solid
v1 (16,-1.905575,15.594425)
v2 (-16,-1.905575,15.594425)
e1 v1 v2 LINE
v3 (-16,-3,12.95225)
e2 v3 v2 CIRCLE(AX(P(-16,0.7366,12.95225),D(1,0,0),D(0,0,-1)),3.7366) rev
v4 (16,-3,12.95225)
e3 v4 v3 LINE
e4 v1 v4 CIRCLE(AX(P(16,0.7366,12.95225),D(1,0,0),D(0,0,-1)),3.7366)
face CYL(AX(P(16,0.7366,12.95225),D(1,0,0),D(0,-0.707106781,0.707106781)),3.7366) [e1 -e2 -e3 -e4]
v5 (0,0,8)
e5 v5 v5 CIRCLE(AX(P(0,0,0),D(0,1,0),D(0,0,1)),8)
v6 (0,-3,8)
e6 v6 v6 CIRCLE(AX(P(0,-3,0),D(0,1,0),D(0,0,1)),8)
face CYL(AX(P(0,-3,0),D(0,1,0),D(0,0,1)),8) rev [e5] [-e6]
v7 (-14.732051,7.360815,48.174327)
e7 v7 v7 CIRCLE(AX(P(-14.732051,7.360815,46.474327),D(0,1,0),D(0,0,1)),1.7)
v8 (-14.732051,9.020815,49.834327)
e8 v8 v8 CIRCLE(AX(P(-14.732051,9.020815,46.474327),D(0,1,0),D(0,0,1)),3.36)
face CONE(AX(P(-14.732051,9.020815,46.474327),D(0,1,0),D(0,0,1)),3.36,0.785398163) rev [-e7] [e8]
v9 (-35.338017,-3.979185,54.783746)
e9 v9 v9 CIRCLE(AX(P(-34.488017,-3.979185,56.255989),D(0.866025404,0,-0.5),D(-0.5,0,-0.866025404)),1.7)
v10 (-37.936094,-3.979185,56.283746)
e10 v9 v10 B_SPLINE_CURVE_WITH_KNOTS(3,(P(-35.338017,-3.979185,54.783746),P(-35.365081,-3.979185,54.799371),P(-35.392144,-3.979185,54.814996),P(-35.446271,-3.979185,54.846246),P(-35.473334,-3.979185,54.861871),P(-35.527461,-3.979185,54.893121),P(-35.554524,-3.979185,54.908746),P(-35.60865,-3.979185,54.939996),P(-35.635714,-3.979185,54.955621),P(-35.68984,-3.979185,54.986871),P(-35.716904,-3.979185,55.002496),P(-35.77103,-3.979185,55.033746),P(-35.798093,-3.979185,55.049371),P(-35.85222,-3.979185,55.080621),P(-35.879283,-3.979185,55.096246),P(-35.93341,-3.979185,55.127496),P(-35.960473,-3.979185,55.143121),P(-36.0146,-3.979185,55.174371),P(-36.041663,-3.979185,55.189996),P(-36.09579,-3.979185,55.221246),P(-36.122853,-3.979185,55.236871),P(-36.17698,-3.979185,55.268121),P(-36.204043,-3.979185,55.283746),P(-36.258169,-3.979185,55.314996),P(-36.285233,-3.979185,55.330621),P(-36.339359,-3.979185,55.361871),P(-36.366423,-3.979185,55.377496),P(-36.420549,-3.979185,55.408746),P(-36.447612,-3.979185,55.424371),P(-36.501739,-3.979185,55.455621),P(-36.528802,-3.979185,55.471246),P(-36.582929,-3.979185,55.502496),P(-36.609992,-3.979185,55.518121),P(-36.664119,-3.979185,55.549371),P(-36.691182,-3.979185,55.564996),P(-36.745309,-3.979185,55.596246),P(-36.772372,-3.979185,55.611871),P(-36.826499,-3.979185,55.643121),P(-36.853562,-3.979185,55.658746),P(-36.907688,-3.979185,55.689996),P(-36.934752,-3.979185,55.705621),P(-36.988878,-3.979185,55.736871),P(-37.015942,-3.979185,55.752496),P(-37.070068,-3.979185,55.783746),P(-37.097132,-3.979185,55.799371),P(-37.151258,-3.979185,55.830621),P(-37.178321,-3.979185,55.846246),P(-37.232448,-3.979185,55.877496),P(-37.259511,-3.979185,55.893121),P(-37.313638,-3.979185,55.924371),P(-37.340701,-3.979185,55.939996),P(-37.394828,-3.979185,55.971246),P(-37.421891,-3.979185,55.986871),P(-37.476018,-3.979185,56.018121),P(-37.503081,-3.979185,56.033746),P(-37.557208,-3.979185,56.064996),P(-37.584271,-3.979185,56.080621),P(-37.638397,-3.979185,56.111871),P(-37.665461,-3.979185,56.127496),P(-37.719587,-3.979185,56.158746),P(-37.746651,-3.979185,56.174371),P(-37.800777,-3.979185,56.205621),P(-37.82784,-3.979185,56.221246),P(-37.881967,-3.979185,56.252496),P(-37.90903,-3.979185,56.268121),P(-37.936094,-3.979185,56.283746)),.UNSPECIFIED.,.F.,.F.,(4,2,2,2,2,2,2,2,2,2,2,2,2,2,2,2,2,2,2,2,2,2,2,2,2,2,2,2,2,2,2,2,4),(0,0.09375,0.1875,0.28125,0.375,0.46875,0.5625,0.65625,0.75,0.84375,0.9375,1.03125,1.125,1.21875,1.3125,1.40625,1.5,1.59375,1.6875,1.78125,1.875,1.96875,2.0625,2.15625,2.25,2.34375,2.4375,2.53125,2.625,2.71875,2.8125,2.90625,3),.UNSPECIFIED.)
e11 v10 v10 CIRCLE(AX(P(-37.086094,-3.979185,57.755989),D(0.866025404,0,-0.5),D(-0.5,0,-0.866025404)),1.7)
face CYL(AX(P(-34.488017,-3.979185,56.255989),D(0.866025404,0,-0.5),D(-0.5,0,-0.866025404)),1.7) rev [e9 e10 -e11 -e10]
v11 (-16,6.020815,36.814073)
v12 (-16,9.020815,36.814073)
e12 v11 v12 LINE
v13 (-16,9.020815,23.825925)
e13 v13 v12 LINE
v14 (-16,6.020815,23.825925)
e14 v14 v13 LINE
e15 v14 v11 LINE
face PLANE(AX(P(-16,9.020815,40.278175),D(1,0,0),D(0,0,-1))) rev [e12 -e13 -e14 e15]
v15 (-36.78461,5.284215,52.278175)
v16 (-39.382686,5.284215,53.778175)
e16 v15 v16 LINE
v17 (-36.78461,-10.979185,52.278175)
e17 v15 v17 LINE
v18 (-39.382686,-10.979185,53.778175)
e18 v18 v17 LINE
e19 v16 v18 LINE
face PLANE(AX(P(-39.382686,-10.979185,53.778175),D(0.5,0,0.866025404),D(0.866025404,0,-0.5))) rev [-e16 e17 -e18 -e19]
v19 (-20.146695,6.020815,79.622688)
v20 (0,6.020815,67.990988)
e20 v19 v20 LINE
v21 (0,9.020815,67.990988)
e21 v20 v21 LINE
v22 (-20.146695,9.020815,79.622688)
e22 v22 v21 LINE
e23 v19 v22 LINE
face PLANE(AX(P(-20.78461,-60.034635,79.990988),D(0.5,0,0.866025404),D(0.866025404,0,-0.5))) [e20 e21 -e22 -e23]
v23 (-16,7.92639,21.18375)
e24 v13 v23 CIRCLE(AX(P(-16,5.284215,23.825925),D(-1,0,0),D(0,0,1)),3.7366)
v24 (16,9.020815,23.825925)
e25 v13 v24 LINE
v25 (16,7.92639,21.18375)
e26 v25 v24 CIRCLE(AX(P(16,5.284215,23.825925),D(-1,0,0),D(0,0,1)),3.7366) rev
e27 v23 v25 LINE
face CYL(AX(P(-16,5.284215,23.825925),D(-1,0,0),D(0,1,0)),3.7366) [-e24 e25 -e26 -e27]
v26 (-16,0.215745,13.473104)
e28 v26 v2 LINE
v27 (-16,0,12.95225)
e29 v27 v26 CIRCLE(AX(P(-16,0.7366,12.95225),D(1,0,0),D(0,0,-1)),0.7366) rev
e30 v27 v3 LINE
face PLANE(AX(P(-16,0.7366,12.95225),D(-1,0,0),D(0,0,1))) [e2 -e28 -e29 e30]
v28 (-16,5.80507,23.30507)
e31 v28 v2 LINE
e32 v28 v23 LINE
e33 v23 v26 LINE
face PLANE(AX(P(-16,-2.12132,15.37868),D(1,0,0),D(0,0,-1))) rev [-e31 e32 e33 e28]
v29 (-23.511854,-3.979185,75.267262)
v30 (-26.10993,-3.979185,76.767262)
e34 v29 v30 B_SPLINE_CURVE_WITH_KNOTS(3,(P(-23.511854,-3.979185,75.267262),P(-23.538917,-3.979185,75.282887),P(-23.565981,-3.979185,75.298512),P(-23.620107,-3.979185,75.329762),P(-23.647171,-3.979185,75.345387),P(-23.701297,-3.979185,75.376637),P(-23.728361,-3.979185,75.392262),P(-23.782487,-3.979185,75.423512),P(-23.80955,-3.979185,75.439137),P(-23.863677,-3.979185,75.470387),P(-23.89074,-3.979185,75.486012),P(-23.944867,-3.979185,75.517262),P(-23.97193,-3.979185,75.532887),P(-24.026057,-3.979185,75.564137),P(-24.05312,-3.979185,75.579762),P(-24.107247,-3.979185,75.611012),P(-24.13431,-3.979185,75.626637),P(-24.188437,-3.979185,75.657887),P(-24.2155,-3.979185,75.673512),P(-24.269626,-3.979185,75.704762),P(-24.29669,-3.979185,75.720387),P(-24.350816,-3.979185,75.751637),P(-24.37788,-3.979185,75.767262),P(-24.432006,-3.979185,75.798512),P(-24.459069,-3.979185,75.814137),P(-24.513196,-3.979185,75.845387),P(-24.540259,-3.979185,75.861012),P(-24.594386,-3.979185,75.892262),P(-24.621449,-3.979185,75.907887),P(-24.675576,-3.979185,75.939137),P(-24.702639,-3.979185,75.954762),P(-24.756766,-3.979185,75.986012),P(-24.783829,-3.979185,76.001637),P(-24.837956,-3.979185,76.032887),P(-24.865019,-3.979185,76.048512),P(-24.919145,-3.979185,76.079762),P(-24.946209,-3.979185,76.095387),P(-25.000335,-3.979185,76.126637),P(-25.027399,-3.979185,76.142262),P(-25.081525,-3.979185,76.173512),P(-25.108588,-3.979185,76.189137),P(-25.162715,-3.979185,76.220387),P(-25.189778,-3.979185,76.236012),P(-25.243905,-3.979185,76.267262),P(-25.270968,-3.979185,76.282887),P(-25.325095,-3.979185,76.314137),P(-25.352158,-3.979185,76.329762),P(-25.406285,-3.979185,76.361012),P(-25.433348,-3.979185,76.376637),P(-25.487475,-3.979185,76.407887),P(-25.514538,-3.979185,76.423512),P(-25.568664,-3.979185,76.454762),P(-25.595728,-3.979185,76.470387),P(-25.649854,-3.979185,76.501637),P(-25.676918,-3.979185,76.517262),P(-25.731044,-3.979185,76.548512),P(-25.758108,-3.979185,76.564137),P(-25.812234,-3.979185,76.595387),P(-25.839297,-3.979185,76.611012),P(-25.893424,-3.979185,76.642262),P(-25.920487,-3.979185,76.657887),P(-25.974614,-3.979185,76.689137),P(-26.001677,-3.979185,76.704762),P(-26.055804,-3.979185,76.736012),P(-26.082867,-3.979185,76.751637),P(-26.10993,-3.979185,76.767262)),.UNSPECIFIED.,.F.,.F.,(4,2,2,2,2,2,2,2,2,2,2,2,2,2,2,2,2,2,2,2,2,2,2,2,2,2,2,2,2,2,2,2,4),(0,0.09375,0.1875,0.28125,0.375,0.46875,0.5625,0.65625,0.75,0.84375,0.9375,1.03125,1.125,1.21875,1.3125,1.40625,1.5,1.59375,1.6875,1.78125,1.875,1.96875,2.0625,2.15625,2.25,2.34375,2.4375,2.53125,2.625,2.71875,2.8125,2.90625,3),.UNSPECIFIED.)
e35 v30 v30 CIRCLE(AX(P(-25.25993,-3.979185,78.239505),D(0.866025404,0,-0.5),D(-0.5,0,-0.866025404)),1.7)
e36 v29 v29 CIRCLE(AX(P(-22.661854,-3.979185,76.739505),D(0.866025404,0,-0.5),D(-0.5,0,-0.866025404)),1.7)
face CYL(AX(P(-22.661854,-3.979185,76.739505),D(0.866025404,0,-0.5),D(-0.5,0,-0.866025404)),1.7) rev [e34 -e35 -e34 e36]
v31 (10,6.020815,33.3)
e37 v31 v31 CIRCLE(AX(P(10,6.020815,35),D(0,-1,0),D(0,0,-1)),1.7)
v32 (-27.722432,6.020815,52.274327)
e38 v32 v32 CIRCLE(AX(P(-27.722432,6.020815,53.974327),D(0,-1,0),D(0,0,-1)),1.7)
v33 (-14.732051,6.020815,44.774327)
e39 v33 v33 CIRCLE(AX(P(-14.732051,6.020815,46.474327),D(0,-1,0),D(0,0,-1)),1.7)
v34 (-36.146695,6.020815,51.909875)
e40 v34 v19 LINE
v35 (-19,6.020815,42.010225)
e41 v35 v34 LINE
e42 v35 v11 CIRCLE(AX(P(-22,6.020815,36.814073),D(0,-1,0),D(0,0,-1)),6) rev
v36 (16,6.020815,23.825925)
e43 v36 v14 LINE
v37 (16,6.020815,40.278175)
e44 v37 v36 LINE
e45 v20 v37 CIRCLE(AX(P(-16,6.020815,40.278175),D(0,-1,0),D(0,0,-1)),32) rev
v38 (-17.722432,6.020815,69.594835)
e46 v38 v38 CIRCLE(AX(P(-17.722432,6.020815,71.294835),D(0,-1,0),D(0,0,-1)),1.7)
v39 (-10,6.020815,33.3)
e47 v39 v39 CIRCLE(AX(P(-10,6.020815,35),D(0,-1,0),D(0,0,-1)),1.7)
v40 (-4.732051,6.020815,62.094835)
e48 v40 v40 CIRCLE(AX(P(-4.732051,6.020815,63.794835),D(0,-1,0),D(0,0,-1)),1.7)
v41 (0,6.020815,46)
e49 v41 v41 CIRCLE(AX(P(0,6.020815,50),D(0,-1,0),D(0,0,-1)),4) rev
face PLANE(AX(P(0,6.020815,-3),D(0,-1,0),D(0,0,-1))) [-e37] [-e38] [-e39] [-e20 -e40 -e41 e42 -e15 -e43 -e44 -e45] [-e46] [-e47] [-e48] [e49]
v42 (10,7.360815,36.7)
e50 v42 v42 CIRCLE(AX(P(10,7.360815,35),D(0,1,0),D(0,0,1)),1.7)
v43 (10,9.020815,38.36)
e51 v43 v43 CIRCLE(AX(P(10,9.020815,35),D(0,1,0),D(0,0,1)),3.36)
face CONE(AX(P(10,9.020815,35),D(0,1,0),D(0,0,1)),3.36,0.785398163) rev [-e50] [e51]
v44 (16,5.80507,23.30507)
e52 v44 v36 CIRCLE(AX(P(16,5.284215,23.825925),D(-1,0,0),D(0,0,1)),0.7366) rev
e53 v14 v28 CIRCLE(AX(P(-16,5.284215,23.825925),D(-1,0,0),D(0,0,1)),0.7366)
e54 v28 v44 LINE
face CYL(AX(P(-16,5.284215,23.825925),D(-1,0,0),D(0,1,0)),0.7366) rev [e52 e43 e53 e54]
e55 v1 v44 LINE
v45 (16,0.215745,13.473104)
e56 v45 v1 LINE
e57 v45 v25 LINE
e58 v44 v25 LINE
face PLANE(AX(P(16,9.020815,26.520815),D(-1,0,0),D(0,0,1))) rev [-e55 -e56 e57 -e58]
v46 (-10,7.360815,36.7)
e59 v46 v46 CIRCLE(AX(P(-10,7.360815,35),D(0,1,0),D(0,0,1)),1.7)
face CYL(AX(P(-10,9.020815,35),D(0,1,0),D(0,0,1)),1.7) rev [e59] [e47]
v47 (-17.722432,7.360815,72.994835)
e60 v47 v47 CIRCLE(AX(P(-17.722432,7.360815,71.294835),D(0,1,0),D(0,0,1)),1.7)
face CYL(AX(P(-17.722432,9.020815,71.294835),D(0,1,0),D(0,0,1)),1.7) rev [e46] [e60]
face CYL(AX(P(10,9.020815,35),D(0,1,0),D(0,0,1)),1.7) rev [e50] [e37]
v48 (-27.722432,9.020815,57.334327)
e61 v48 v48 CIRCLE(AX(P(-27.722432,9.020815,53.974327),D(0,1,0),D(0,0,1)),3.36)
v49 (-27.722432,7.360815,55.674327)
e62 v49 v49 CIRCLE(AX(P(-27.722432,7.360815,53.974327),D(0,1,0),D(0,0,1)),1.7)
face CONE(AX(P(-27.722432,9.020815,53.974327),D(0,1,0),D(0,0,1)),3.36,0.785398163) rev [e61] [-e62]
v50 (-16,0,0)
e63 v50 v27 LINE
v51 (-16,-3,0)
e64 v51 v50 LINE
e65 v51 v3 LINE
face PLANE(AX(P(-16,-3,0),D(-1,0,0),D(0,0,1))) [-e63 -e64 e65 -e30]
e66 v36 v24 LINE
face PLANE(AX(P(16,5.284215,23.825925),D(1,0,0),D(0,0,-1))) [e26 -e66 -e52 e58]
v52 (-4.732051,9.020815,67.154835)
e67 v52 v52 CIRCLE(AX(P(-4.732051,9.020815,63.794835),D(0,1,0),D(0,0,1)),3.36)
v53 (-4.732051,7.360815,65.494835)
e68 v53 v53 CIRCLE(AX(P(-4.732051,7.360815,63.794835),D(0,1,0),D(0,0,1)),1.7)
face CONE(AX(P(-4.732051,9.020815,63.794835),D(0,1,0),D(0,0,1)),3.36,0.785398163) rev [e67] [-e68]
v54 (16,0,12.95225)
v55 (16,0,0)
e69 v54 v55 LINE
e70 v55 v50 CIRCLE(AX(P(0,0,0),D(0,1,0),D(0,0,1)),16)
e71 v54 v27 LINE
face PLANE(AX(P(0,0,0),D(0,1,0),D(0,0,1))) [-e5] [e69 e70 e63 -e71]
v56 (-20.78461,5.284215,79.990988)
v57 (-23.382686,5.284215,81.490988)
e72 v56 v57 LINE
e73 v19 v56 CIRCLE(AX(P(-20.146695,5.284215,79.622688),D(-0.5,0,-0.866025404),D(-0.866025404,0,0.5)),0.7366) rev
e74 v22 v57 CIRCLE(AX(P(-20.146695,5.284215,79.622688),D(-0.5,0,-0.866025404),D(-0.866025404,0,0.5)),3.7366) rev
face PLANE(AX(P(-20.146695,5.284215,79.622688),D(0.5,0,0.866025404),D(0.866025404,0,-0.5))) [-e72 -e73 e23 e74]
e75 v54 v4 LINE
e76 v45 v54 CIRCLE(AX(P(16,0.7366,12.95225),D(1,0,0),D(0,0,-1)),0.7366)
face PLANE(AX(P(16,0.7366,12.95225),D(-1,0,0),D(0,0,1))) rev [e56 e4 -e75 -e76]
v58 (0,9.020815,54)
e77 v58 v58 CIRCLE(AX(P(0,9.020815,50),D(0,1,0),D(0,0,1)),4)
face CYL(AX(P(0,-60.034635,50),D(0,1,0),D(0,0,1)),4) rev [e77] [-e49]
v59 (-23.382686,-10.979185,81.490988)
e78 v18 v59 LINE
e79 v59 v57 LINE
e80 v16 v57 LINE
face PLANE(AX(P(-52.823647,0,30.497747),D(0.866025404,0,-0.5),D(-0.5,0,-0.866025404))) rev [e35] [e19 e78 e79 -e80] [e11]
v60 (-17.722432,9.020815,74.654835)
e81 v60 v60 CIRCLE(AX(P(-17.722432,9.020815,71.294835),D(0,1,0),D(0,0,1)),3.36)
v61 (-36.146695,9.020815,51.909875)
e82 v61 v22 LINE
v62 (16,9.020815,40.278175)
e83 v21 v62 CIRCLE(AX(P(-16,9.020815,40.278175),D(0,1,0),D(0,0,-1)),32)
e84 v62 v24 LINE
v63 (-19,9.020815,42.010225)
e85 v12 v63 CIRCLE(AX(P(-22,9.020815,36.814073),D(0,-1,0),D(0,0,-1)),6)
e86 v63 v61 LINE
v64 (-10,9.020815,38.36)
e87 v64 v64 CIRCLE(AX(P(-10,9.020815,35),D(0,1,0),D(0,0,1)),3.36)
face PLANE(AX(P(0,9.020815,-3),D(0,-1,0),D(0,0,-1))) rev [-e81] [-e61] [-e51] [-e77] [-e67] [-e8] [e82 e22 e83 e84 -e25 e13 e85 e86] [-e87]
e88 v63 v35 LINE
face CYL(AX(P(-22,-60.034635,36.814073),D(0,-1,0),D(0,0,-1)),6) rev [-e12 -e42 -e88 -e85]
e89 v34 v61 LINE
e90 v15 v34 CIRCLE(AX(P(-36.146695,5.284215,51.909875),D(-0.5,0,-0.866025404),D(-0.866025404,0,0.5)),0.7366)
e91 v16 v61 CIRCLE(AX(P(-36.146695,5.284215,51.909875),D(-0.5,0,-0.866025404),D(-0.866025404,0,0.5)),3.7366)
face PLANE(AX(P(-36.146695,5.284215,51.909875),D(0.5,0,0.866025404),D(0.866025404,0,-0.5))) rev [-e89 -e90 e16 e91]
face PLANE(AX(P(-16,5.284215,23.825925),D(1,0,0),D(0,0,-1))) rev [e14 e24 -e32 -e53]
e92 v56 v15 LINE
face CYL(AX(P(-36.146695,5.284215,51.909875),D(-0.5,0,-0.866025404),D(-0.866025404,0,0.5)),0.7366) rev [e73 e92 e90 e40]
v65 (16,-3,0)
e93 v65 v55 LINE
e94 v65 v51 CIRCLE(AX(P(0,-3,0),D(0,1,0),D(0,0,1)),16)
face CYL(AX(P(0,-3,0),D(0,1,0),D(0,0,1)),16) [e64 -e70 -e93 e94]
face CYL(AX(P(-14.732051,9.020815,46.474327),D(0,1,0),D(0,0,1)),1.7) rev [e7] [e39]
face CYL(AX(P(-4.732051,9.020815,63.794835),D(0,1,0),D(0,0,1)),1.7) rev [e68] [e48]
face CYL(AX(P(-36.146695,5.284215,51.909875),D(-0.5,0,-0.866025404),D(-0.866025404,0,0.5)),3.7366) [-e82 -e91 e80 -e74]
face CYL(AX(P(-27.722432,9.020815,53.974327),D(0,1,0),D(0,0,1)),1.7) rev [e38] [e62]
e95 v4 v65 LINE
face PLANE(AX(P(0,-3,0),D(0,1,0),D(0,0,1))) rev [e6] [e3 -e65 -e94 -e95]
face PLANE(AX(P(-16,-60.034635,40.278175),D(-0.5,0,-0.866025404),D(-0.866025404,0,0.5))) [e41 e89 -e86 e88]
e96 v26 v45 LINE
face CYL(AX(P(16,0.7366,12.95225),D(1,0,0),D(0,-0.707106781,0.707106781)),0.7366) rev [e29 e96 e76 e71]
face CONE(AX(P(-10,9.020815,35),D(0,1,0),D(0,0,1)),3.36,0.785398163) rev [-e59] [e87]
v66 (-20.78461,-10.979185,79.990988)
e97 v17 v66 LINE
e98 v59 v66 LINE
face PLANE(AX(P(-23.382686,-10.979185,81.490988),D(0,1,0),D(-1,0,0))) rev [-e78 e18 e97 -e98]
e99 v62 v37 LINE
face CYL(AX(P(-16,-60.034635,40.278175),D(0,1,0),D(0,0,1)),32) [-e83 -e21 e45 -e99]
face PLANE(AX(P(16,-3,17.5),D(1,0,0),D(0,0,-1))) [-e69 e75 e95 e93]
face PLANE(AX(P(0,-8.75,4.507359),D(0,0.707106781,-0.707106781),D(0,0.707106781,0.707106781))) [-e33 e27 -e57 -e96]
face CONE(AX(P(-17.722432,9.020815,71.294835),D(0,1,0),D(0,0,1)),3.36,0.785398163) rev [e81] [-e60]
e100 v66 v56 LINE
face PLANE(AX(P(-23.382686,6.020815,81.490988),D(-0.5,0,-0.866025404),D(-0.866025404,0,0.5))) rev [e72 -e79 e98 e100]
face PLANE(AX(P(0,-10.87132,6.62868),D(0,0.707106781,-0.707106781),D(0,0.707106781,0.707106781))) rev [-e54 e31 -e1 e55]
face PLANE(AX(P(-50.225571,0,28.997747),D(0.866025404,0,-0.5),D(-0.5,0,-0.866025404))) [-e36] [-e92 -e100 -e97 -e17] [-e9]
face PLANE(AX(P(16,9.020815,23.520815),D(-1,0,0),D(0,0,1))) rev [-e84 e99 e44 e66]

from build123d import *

# Parameters (mm, degrees)
SKETCH2_R                                            = 8
BASE_FLANGE1_DEPTH                                   = 3
EDGE_FLANGE1_START                                   = -16
EDGE_FLANGE1_DEPTH                                   = 32
EDGE_FLANGE1_2_DEPTH                                 = 32
EDGE_FLANGE2_START                                   = -16
EDGE_FLANGE2_DEPTH                                   = 32
EDGE_FLANGE2_2_DEPTH                                 = 32
SKETCH15_R                                           = 4
BOSS_EXTRUDE1_DEPTH                                  = 3
EDGE_FLANGE3_STRIP_W                                 = 13.4732
EDGE_FLANGE3_STRIP_H                                 = 3
EDGE_FLANGE3_STRIP_CUT_DEPTH                         = 32
EDGE_FLANGE3_DEPTH                                   = 32
CSK_FOR_M3_HEX_SOCKET_COUNTERSUNK_CAP_SC_D           = 3.4
CSK_FOR_M3_HEX_SOCKET_COUNTERSUNK_CAP_SC_CSINK_D     = 6.72
CSK_FOR_M3_HEX_SOCKET_COUNTERSUNK_CAP_SC_CSINK_ANGLE = 90
FILLET1_R                                            = 6
M3_CLEARANCE_HOLE1_D                                 = 3.4


# Read off the part's stored shape, not the designer's step: Edge-Flange1, Edge-Flange2
# Sheet-metal steps are written as plain solids
with BuildPart() as part:
    # Sketch2 → Base-Flange1 (new body)
    with BuildSketch(Plane(origin=(0, 0, 0), x_dir=(1, 0, 0), z_dir=(0, 1, 0))):
        with BuildLine():
            Line((-16, 0), (-16, -17.5))
            Line((-16, -17.5), (16, -17.5))
            Line((16, -17.5), (16, 0))
            ThreePointArc((16, 0), (0, 16), (-16, 0))
        make_face()
        with Locations(Location((0, 0, 0), (0, 0, 270))):
            Circle(SKETCH2_R, mode=Mode.SUBTRACT)
    extrude(amount=-BASE_FLANGE1_DEPTH)

    # Edge-Flange1 outline → Edge-Flange1 (cut)
    with BuildSketch(Plane.YZ.offset(EDGE_FLANGE1_START)):
        with BuildLine():
            ThreePointArc((-3, 12.952249603), (-2.715568261, 14.382184516), (-1.905575199, 15.594424801))
            Line((-1.905575199, 15.594424801), (0, 17.5))
            Line((0, 17.5), (-3, 17.5))
            Line((-3, 17.5), (-3, 12.952249603))
        make_face()
    extrude(amount=EDGE_FLANGE1_DEPTH, mode=Mode.SUBTRACT)

    # Edge-Flange1 2 outline → Edge-Flange1 2 (add)
    with BuildSketch(Plane.YZ.offset(EDGE_FLANGE1_START)):
        with BuildLine():
            Line((9.02081528, 26.52081528), (0, 17.5))
            Line((0, 17.5), (0, 12.952249603))
            ThreePointArc((0, 12.952249603), (0.056070336, 13.234134219), (0.215745145, 13.473104458))
            Line((0.215745145, 13.473104458), (11.142135624, 24.399494937))
            Line((11.142135624, 24.399494937), (9.02081528, 26.52081528))
        make_face()
    extrude(amount=EDGE_FLANGE1_2_DEPTH)

    # Edge-Flange2 outline → Edge-Flange2 (cut)
    with BuildSketch(Plane.YZ.offset(EDGE_FLANGE2_START)):
        with BuildLine():
            Line((9.02081528, 26.52081528), (9.02081528, 23.82592499))
            ThreePointArc((9.02081528, 23.82592499), (8.736383541, 22.395990077), (7.926390479, 21.183749792))
            Line((7.926390479, 21.183749792), (11.142135624, 24.399494937))
            Line((11.142135624, 24.399494937), (9.02081528, 26.52081528))
        make_face()
    extrude(amount=EDGE_FLANGE2_DEPTH, mode=Mode.SUBTRACT)

    # Edge-Flange2 2 outline → Edge-Flange2 2 (add)
    with BuildSketch(Plane.YZ.offset(EDGE_FLANGE2_START)):
        with BuildLine():
            Line((5.805070135, 23.305070135), (9.02081528, 26.52081528))
            Line((9.02081528, 26.52081528), (9.02081528, 40.278174593))
            Line((9.02081528, 40.278174593), (6.02081528, 40.278174593))
            Line((6.02081528, 40.278174593), (6.02081528, 23.82592499))
            ThreePointArc((6.02081528, 23.82592499), (5.964744944, 23.544040374), (5.805070135, 23.305070135))
        make_face()
    extrude(amount=EDGE_FLANGE2_2_DEPTH)

    # Sketch15 → Boss-Extrude1 (add)
    with BuildSketch(Plane(origin=(0, 9.02081528, 0), x_dir=(1, 0, 0), z_dir=(0, 1, 0))):
        with BuildLine():
            Line((-16, -40.278174593), (-36.784609691, -52.278174593))
            Line((-36.784609691, -52.278174593), (-20.784609691, -79.990987514))
            Line((-20.784609691, -79.990987514), (0, -67.990987514))
            ThreePointArc((0, -67.990987514), (11.712812921, -56.278174593), (16, -40.278174593))
            Line((16, -40.278174593), (-16, -40.278174593))
        make_face()
        with Locations(Location((0, -50, 0), (0, 0, 270))):
            Circle(SKETCH15_R, mode=Mode.SUBTRACT)
    extrude(amount=-BOSS_EXTRUDE1_DEPTH)

    # Edge-Flange3 strip (across the edge) → Edge-Flange3 strip cut (cut)
    with BuildSketch(Plane(origin=(-20.784609691, 6.02081528, 79.990987514), x_dir=(0.8660254037844396, -3.491481338843133e-15, -0.4999999999999983), z_dir=(-0.4999999999999983, 0, -0.8660254037844396))):
        with Locations((-6, -1.5)):
            Rectangle(EDGE_FLANGE3_STRIP_W, EDGE_FLANGE3_STRIP_H)
    extrude(amount=EDGE_FLANGE3_STRIP_CUT_DEPTH, mode=Mode.SUBTRACT)

    # Edge-Flange3 section (across the edge) → Edge-Flange3 (add)
    with BuildSketch(Plane(origin=(-20.784609691, 6.02081528, 79.990987514), x_dir=(0.8660254037844396, -3.491481338843133e-15, -0.4999999999999983), z_dir=(-0.4999999999999983, 0, -0.8660254037844396))):
        with BuildLine():
            Line((-3, 0.7366), (-3, 17))
            Line((-3, 17), (0, 17))
            Line((0, 17), (0, 0.7366))
            ThreePointArc((0, 0.7366), (0.215745145, 0.215745145), (0.7366, 0))
            Line((0.7366, 0), (0.7366, -3))
            ThreePointArc((0.7366, -3), (-1.905575199, -1.905575199), (-3, 0.7366))
        make_face()
    extrude(amount=EDGE_FLANGE3_DEPTH)

    # CSK for M3 Hex Socket Countersunk Cap Screw1 (through all)
    with Locations(Plane(origin=(0, 9.02081528, 0), x_dir=(1, 0, 0), z_dir=(0, 1, 0))):
        with Locations((-27.722431864, -53.974327016), (-14.732050808, -46.474327016), (-4.732050808, -63.794835091), (-17.722431864, -71.294835091), (-10, -35), (10, -35)):
            CounterSinkHole(CSK_FOR_M3_HEX_SOCKET_COUNTERSUNK_CAP_SC_D / 2, CSK_FOR_M3_HEX_SOCKET_COUNTERSUNK_CAP_SC_CSINK_D / 2, counter_sink_angle=CSK_FOR_M3_HEX_SOCKET_COUNTERSUNK_CAP_SC_CSINK_ANGLE)

    # Fillet1
    fillet1_edges = [part.edges().sort_by_distance(p)[0] for p in [
        (-16, 7.52081528, 40.278174593),
    ]]
    fillet(fillet1_edges, radius=FILLET1_R)

    # M3 Clearance Hole1 (through all)
    with Locations(Plane(origin=(-50.225570899, 0, 28.997746879), x_dir=(-0.49999999999999806, 2.339652494442703e-15, -0.8660254037844398), z_dir=(0.8660254037844397, -4.052396992430042e-15, -0.499999999999998))):
        with Locations((-55.127433482, -3.97918472), (-31.475106897, -3.97918472)):
            Hole(M3_CLEARANCE_HOLE1_D / 2)


solid = part.part
